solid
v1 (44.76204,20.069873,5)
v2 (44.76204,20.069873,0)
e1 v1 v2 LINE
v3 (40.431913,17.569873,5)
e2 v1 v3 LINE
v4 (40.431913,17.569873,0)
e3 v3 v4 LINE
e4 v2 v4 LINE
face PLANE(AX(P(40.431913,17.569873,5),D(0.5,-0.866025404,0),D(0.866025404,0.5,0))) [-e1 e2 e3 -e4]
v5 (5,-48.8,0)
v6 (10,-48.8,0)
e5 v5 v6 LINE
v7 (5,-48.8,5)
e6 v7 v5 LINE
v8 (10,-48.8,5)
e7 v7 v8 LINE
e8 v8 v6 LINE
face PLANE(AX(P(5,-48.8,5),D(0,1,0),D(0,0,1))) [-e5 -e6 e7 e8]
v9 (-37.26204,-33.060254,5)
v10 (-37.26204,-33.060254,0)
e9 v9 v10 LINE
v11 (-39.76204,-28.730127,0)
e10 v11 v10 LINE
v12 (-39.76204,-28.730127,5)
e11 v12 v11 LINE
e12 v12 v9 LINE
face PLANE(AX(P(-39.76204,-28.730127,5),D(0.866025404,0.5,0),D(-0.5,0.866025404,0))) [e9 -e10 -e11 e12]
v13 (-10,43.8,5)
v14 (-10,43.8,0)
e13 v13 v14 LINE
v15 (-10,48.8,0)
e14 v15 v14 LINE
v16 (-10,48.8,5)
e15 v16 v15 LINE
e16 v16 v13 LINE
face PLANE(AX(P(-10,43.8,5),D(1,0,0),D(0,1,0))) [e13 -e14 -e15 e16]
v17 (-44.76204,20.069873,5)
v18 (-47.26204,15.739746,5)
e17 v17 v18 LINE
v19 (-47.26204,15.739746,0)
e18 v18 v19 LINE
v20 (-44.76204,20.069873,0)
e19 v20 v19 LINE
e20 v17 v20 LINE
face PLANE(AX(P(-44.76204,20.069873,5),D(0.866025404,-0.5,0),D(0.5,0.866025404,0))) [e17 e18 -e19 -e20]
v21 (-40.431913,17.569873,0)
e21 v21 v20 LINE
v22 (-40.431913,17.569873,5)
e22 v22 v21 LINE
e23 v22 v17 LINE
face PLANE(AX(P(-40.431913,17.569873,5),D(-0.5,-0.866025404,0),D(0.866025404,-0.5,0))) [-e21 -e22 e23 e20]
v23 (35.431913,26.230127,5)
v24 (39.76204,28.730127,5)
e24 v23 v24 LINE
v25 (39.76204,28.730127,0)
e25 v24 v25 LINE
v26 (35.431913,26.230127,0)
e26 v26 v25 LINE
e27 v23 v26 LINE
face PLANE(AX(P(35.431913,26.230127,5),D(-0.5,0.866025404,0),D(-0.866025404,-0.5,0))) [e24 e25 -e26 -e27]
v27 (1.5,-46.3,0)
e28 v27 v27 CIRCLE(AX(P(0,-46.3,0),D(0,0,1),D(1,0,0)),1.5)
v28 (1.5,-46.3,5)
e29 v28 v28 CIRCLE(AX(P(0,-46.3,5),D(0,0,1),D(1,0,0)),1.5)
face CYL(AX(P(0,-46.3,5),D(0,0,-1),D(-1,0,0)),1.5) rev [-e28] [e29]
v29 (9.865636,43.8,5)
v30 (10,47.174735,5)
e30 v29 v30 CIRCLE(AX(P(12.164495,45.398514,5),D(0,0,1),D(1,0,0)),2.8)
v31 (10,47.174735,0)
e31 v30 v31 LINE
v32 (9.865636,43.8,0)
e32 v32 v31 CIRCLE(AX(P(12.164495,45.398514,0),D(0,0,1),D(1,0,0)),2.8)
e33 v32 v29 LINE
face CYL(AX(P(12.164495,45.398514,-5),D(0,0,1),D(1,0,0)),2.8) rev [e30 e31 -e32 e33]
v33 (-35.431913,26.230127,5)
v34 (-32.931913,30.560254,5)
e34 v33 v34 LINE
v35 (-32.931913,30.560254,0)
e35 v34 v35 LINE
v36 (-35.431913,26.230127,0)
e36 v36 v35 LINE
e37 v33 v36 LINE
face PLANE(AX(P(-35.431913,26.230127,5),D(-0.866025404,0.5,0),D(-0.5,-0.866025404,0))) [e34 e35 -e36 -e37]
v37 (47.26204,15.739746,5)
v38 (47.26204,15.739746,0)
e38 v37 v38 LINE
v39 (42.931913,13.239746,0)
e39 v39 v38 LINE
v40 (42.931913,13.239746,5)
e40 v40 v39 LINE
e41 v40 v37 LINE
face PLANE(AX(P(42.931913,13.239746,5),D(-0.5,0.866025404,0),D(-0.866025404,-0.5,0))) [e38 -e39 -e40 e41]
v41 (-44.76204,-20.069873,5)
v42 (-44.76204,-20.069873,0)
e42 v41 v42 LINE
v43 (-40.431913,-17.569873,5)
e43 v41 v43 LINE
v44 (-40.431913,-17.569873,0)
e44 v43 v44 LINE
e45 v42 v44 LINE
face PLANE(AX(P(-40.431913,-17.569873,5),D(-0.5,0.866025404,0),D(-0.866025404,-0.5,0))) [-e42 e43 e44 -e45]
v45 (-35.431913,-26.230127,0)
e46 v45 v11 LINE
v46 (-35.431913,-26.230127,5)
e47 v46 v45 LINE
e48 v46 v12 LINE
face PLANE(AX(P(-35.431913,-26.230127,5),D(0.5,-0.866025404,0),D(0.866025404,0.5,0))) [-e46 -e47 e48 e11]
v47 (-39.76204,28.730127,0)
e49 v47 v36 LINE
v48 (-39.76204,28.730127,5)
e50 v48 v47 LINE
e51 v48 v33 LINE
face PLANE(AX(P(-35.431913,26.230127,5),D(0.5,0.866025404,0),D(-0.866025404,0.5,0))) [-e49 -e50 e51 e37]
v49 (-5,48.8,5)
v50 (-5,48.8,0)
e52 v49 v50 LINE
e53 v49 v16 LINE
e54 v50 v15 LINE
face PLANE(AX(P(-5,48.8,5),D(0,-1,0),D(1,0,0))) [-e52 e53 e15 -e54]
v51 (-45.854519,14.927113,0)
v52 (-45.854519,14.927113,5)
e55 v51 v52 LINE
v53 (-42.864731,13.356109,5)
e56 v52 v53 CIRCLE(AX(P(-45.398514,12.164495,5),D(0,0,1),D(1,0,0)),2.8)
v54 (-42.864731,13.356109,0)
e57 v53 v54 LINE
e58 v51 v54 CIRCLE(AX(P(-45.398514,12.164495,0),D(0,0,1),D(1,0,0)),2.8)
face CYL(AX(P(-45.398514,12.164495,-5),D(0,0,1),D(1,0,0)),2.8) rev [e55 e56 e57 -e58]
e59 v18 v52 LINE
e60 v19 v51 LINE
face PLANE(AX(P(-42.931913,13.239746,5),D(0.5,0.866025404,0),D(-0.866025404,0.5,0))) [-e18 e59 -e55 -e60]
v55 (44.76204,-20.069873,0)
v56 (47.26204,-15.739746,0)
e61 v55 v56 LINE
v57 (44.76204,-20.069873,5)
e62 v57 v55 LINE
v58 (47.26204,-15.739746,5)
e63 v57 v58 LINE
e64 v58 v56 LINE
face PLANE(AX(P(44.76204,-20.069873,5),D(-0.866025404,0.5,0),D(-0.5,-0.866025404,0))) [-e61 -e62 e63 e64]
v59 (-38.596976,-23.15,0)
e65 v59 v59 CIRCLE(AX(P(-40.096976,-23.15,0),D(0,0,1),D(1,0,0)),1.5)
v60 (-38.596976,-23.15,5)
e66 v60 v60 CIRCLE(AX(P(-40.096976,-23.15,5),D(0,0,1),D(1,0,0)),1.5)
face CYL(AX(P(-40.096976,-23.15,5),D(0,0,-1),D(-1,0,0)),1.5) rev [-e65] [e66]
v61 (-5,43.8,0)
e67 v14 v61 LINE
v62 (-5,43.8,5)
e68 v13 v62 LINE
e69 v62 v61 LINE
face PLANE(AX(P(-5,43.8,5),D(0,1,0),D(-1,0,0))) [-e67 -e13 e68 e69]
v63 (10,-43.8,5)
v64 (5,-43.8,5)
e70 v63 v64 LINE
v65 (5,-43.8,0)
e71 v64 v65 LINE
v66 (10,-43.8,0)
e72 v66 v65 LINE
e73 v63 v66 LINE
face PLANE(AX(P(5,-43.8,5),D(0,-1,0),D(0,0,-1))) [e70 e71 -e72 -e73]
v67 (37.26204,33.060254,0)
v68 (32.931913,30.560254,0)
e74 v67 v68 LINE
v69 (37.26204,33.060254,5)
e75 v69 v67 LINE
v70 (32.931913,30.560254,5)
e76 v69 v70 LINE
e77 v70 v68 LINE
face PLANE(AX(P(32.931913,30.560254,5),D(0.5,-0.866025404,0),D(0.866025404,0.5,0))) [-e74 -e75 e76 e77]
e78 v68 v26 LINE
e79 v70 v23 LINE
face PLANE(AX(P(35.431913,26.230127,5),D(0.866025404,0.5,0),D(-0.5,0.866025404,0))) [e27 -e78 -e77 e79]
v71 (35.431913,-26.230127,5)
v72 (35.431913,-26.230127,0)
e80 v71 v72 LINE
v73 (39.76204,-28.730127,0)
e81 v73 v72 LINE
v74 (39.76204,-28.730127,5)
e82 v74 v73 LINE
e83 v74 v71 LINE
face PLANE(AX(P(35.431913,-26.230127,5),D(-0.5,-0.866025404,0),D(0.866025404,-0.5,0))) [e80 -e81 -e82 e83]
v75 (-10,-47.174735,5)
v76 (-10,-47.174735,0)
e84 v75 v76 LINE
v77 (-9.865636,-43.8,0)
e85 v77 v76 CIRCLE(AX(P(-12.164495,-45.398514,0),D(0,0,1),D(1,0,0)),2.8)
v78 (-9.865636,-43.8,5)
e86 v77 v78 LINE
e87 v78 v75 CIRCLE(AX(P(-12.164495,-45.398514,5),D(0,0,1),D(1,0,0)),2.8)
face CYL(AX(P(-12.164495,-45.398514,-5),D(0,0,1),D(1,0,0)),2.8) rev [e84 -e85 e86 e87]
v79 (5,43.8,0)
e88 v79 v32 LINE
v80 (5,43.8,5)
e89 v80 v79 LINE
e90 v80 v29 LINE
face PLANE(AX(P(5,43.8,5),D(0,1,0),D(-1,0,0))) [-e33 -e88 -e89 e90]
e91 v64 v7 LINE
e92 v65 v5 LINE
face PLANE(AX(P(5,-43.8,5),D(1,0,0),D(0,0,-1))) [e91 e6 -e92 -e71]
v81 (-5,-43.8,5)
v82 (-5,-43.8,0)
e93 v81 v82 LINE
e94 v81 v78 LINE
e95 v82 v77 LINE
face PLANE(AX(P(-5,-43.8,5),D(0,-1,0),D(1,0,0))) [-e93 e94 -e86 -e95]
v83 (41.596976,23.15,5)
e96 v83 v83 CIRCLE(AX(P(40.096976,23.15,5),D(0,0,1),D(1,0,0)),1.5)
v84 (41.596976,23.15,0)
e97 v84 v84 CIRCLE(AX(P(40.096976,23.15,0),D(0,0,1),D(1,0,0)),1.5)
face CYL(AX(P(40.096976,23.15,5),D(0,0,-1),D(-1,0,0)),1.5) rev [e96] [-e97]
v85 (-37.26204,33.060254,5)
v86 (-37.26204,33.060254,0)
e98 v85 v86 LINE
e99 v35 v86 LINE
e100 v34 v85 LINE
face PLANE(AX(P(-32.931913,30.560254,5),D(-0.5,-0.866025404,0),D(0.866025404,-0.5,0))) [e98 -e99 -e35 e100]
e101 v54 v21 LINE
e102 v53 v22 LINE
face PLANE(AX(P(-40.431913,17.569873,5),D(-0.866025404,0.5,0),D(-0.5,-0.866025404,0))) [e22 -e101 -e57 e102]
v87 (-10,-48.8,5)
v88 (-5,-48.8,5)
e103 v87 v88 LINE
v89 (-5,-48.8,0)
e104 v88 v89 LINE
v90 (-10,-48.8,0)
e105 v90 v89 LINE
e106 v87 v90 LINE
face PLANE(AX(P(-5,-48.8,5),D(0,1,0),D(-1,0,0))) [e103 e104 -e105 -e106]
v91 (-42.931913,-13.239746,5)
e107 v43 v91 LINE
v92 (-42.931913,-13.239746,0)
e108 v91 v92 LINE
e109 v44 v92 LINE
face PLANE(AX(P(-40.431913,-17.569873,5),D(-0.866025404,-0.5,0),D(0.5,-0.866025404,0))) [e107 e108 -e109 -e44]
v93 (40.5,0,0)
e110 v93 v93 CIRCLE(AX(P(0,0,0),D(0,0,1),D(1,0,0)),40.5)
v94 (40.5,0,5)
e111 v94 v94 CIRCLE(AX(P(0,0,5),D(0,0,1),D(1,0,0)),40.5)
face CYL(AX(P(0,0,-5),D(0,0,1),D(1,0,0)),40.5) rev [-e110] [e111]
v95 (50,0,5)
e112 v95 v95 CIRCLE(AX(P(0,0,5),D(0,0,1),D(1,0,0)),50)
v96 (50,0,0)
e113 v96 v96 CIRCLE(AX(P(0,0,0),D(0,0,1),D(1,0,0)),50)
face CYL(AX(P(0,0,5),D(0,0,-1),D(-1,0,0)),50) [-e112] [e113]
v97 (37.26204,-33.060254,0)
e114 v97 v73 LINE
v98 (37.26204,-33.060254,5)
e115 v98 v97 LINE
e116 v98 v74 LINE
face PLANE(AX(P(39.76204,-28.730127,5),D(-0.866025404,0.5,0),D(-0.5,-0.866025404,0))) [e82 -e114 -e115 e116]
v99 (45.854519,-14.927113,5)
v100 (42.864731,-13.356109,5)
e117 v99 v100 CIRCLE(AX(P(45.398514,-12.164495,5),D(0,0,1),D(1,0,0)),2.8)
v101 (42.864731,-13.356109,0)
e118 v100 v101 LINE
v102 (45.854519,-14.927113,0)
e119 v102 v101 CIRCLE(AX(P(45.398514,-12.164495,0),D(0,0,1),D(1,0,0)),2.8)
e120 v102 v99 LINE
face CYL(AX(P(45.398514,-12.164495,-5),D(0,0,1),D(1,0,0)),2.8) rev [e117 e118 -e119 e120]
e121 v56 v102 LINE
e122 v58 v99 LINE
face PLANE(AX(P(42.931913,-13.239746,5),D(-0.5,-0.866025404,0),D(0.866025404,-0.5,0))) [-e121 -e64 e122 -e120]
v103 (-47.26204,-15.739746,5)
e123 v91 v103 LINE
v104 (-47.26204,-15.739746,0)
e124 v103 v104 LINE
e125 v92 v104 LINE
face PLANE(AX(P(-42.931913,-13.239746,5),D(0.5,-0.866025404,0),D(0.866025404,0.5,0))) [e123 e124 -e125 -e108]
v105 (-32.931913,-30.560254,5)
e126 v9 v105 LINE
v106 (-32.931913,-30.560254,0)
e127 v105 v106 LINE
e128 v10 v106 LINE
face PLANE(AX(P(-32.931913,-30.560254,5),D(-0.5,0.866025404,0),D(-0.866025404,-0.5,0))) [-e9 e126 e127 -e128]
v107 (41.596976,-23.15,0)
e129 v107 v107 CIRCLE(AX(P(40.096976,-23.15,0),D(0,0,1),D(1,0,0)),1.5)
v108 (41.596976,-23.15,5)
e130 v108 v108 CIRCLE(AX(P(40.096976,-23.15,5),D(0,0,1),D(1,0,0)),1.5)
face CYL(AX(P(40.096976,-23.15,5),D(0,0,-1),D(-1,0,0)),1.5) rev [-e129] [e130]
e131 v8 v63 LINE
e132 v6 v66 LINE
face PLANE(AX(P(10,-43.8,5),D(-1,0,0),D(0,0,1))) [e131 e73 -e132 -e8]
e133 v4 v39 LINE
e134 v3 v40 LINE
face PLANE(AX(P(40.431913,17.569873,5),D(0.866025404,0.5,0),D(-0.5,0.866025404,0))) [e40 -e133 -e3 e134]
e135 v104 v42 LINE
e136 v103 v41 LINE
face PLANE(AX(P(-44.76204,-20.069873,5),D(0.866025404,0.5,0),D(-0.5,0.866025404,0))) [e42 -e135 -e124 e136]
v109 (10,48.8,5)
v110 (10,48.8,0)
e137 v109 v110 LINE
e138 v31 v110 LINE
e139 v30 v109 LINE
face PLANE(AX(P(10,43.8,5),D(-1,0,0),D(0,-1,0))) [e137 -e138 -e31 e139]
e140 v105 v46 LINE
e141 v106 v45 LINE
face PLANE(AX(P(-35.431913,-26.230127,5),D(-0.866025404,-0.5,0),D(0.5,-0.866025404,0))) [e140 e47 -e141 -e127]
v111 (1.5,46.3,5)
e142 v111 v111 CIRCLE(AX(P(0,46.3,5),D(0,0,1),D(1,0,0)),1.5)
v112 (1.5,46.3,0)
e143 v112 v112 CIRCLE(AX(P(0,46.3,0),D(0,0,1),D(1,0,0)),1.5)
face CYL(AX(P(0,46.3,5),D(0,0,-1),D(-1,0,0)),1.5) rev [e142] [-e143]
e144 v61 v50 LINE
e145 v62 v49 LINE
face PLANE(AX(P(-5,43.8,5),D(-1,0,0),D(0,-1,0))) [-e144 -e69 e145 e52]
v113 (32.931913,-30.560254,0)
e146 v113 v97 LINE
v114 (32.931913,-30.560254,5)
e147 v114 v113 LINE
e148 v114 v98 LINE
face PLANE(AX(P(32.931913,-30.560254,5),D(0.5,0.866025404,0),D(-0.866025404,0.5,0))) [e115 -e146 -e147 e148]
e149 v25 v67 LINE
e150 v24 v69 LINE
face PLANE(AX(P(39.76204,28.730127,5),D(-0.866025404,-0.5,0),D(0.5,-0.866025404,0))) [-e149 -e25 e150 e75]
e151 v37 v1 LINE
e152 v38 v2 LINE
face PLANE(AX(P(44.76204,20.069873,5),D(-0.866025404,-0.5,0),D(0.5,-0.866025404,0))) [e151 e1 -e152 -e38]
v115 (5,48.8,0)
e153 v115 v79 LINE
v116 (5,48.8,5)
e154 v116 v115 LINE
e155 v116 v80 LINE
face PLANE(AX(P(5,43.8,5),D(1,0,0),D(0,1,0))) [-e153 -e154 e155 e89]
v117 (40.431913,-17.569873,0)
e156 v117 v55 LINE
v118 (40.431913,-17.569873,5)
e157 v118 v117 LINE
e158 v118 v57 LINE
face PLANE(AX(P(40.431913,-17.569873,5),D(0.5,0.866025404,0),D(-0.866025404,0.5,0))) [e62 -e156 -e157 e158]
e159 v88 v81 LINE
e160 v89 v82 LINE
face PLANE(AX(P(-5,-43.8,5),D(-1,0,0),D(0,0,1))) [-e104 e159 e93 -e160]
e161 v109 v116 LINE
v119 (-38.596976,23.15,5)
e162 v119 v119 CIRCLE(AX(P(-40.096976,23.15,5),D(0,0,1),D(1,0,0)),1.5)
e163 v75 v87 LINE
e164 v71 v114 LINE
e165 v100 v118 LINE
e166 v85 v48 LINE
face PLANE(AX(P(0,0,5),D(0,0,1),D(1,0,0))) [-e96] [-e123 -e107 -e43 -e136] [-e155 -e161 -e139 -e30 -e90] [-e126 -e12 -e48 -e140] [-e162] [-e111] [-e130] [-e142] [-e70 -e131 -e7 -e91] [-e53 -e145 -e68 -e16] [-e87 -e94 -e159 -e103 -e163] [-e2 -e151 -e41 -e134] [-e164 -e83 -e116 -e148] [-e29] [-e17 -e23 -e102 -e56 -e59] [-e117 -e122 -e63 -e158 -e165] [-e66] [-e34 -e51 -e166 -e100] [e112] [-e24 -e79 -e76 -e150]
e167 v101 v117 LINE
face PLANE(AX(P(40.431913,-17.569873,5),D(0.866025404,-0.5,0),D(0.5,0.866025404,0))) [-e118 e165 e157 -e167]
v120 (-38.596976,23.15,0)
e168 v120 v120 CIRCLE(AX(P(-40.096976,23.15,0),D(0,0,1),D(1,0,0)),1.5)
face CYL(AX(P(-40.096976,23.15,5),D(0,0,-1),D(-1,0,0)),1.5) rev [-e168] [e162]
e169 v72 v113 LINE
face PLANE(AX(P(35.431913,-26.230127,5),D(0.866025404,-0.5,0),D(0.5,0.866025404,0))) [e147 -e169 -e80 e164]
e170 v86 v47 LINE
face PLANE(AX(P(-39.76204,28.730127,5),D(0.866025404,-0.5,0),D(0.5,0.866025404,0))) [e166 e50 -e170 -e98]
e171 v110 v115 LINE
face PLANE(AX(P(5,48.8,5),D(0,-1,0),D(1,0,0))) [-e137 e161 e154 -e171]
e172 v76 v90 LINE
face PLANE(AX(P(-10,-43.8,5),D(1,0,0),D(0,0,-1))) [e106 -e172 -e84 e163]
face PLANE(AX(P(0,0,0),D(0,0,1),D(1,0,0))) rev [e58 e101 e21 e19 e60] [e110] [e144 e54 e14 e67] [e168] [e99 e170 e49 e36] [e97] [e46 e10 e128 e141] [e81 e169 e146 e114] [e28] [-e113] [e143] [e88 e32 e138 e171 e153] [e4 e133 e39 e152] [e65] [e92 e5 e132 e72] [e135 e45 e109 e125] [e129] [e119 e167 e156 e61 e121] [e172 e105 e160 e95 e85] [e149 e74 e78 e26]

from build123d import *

# Parameters (mm, degrees)
BOSS_EXTRU_1_OUTLINE_R   = 50
BOSS_EXTRU_1_OUTLINE_W   = 5
BOSS_EXTRU_1_OUTLINE_H   = 5
BOSS_EXTRU_1_OUTLINE_R_2 = 1.5
BOSS_EXTRU_1_DEPTH       = 5
SKETCH4_R                = 2.8
CUT_EXTRUDE4_DEPTH       = 10
SKETCH5_R                = 40.5
CUT_EXTRUDE5_DEPTH       = 10


# Read off the part's stored shape, not the designer's step: Boss.-Extru.1
with BuildPart() as part:
    # Boss.-Extru.1 outline → Boss.-Extru.1 (new body)
    with BuildSketch(Plane.XY):
        Circle(BOSS_EXTRU_1_OUTLINE_R)
        Polygon((-37.262039705, -33.060254038), (-39.762039705, -28.730127019), (-35.431912686, -26.230127019), (-32.931912686, -30.560254038), align=None, mode=Mode.SUBTRACT)
        with Locations((-7.5, -46.3)):
            Rectangle(BOSS_EXTRU_1_OUTLINE_W, BOSS_EXTRU_1_OUTLINE_H, mode=Mode.SUBTRACT)
        with Locations((-40.096976195, -23.15)):
            Circle(BOSS_EXTRU_1_OUTLINE_R_2, mode=Mode.SUBTRACT)
        Polygon((-42.931912686, -13.239745962), (-40.431912686, -17.569872981), (-44.762039705, -20.069872981), (-47.262039705, -15.739745962), align=None, mode=Mode.SUBTRACT)
        with Locations((0, -46.3)):
            Circle(BOSS_EXTRU_1_OUTLINE_R_2, mode=Mode.SUBTRACT)
        with Locations((7.5, -46.3)):
            Rectangle(BOSS_EXTRU_1_OUTLINE_W, BOSS_EXTRU_1_OUTLINE_H, mode=Mode.SUBTRACT)
        Polygon((32.931912686, -30.560254038), (35.431912686, -26.230127019), (39.762039705, -28.730127019), (37.262039705, -33.060254038), align=None, mode=Mode.SUBTRACT)
        with Locations((40.096976195, -23.15)):
            Circle(BOSS_EXTRU_1_OUTLINE_R_2, mode=Mode.SUBTRACT)
        Polygon((47.262039705, -15.739745962), (44.762039705, -20.069872981), (40.431912686, -17.569872981), (42.931912686, -13.239745962), align=None, mode=Mode.SUBTRACT)
        Polygon((-47.262039705, 15.739745962), (-44.762039705, 20.069872981), (-40.431912686, 17.569872981), (-42.931912686, 13.239745962), align=None, mode=Mode.SUBTRACT)
        with Locations((-40.096976195, 23.15)):
            Circle(BOSS_EXTRU_1_OUTLINE_R_2, mode=Mode.SUBTRACT)
        Polygon((-32.931912686, 30.560254038), (-35.431912686, 26.230127019), (-39.762039705, 28.730127019), (-37.262039705, 33.060254038), align=None, mode=Mode.SUBTRACT)
        with Locations((-7.5, 46.3)):
            Rectangle(BOSS_EXTRU_1_OUTLINE_W, BOSS_EXTRU_1_OUTLINE_H, mode=Mode.SUBTRACT)
        Polygon((42.931912686, 13.239745962), (40.431912686, 17.569872981), (44.762039705, 20.069872981), (47.262039705, 15.739745962), align=None, mode=Mode.SUBTRACT)
        with Locations((40.096976195, 23.15)):
            Circle(BOSS_EXTRU_1_OUTLINE_R_2, mode=Mode.SUBTRACT)
        with Locations((0, 46.3)):
            Circle(BOSS_EXTRU_1_OUTLINE_R_2, mode=Mode.SUBTRACT)
        with Locations((7.5, 46.3)):
            Rectangle(BOSS_EXTRU_1_OUTLINE_W, BOSS_EXTRU_1_OUTLINE_H, mode=Mode.SUBTRACT)
        Polygon((37.262039705, 33.060254038), (39.762039705, 28.730127019), (35.431912686, 26.230127019), (32.931912686, 30.560254038), align=None, mode=Mode.SUBTRACT)
    extrude(amount=BOSS_EXTRU_1_DEPTH)

    # Sketch4 → Cut-Extrude4 (cut)
    with BuildSketch(Plane.XY.offset(5)):
        with Locations((-12.16449512, -45.398513836)):
            Circle(SKETCH4_R)
        with Locations((-45.398513836, 12.16449512)):
            Circle(SKETCH4_R)
        with Locations((12.16449512, 45.398513836)):
            Circle(SKETCH4_R)
        with Locations((45.398513836, -12.16449512)):
            Circle(SKETCH4_R)
    extrude(amount=-CUT_EXTRUDE4_DEPTH, mode=Mode.SUBTRACT)

    # Sketch5 → Cut-Extrude5 (cut)
    with BuildSketch(Plane.XY.offset(5)):
        Circle(SKETCH5_R)
    extrude(amount=-CUT_EXTRUDE5_DEPTH, mode=Mode.SUBTRACT)


solid = part.part
